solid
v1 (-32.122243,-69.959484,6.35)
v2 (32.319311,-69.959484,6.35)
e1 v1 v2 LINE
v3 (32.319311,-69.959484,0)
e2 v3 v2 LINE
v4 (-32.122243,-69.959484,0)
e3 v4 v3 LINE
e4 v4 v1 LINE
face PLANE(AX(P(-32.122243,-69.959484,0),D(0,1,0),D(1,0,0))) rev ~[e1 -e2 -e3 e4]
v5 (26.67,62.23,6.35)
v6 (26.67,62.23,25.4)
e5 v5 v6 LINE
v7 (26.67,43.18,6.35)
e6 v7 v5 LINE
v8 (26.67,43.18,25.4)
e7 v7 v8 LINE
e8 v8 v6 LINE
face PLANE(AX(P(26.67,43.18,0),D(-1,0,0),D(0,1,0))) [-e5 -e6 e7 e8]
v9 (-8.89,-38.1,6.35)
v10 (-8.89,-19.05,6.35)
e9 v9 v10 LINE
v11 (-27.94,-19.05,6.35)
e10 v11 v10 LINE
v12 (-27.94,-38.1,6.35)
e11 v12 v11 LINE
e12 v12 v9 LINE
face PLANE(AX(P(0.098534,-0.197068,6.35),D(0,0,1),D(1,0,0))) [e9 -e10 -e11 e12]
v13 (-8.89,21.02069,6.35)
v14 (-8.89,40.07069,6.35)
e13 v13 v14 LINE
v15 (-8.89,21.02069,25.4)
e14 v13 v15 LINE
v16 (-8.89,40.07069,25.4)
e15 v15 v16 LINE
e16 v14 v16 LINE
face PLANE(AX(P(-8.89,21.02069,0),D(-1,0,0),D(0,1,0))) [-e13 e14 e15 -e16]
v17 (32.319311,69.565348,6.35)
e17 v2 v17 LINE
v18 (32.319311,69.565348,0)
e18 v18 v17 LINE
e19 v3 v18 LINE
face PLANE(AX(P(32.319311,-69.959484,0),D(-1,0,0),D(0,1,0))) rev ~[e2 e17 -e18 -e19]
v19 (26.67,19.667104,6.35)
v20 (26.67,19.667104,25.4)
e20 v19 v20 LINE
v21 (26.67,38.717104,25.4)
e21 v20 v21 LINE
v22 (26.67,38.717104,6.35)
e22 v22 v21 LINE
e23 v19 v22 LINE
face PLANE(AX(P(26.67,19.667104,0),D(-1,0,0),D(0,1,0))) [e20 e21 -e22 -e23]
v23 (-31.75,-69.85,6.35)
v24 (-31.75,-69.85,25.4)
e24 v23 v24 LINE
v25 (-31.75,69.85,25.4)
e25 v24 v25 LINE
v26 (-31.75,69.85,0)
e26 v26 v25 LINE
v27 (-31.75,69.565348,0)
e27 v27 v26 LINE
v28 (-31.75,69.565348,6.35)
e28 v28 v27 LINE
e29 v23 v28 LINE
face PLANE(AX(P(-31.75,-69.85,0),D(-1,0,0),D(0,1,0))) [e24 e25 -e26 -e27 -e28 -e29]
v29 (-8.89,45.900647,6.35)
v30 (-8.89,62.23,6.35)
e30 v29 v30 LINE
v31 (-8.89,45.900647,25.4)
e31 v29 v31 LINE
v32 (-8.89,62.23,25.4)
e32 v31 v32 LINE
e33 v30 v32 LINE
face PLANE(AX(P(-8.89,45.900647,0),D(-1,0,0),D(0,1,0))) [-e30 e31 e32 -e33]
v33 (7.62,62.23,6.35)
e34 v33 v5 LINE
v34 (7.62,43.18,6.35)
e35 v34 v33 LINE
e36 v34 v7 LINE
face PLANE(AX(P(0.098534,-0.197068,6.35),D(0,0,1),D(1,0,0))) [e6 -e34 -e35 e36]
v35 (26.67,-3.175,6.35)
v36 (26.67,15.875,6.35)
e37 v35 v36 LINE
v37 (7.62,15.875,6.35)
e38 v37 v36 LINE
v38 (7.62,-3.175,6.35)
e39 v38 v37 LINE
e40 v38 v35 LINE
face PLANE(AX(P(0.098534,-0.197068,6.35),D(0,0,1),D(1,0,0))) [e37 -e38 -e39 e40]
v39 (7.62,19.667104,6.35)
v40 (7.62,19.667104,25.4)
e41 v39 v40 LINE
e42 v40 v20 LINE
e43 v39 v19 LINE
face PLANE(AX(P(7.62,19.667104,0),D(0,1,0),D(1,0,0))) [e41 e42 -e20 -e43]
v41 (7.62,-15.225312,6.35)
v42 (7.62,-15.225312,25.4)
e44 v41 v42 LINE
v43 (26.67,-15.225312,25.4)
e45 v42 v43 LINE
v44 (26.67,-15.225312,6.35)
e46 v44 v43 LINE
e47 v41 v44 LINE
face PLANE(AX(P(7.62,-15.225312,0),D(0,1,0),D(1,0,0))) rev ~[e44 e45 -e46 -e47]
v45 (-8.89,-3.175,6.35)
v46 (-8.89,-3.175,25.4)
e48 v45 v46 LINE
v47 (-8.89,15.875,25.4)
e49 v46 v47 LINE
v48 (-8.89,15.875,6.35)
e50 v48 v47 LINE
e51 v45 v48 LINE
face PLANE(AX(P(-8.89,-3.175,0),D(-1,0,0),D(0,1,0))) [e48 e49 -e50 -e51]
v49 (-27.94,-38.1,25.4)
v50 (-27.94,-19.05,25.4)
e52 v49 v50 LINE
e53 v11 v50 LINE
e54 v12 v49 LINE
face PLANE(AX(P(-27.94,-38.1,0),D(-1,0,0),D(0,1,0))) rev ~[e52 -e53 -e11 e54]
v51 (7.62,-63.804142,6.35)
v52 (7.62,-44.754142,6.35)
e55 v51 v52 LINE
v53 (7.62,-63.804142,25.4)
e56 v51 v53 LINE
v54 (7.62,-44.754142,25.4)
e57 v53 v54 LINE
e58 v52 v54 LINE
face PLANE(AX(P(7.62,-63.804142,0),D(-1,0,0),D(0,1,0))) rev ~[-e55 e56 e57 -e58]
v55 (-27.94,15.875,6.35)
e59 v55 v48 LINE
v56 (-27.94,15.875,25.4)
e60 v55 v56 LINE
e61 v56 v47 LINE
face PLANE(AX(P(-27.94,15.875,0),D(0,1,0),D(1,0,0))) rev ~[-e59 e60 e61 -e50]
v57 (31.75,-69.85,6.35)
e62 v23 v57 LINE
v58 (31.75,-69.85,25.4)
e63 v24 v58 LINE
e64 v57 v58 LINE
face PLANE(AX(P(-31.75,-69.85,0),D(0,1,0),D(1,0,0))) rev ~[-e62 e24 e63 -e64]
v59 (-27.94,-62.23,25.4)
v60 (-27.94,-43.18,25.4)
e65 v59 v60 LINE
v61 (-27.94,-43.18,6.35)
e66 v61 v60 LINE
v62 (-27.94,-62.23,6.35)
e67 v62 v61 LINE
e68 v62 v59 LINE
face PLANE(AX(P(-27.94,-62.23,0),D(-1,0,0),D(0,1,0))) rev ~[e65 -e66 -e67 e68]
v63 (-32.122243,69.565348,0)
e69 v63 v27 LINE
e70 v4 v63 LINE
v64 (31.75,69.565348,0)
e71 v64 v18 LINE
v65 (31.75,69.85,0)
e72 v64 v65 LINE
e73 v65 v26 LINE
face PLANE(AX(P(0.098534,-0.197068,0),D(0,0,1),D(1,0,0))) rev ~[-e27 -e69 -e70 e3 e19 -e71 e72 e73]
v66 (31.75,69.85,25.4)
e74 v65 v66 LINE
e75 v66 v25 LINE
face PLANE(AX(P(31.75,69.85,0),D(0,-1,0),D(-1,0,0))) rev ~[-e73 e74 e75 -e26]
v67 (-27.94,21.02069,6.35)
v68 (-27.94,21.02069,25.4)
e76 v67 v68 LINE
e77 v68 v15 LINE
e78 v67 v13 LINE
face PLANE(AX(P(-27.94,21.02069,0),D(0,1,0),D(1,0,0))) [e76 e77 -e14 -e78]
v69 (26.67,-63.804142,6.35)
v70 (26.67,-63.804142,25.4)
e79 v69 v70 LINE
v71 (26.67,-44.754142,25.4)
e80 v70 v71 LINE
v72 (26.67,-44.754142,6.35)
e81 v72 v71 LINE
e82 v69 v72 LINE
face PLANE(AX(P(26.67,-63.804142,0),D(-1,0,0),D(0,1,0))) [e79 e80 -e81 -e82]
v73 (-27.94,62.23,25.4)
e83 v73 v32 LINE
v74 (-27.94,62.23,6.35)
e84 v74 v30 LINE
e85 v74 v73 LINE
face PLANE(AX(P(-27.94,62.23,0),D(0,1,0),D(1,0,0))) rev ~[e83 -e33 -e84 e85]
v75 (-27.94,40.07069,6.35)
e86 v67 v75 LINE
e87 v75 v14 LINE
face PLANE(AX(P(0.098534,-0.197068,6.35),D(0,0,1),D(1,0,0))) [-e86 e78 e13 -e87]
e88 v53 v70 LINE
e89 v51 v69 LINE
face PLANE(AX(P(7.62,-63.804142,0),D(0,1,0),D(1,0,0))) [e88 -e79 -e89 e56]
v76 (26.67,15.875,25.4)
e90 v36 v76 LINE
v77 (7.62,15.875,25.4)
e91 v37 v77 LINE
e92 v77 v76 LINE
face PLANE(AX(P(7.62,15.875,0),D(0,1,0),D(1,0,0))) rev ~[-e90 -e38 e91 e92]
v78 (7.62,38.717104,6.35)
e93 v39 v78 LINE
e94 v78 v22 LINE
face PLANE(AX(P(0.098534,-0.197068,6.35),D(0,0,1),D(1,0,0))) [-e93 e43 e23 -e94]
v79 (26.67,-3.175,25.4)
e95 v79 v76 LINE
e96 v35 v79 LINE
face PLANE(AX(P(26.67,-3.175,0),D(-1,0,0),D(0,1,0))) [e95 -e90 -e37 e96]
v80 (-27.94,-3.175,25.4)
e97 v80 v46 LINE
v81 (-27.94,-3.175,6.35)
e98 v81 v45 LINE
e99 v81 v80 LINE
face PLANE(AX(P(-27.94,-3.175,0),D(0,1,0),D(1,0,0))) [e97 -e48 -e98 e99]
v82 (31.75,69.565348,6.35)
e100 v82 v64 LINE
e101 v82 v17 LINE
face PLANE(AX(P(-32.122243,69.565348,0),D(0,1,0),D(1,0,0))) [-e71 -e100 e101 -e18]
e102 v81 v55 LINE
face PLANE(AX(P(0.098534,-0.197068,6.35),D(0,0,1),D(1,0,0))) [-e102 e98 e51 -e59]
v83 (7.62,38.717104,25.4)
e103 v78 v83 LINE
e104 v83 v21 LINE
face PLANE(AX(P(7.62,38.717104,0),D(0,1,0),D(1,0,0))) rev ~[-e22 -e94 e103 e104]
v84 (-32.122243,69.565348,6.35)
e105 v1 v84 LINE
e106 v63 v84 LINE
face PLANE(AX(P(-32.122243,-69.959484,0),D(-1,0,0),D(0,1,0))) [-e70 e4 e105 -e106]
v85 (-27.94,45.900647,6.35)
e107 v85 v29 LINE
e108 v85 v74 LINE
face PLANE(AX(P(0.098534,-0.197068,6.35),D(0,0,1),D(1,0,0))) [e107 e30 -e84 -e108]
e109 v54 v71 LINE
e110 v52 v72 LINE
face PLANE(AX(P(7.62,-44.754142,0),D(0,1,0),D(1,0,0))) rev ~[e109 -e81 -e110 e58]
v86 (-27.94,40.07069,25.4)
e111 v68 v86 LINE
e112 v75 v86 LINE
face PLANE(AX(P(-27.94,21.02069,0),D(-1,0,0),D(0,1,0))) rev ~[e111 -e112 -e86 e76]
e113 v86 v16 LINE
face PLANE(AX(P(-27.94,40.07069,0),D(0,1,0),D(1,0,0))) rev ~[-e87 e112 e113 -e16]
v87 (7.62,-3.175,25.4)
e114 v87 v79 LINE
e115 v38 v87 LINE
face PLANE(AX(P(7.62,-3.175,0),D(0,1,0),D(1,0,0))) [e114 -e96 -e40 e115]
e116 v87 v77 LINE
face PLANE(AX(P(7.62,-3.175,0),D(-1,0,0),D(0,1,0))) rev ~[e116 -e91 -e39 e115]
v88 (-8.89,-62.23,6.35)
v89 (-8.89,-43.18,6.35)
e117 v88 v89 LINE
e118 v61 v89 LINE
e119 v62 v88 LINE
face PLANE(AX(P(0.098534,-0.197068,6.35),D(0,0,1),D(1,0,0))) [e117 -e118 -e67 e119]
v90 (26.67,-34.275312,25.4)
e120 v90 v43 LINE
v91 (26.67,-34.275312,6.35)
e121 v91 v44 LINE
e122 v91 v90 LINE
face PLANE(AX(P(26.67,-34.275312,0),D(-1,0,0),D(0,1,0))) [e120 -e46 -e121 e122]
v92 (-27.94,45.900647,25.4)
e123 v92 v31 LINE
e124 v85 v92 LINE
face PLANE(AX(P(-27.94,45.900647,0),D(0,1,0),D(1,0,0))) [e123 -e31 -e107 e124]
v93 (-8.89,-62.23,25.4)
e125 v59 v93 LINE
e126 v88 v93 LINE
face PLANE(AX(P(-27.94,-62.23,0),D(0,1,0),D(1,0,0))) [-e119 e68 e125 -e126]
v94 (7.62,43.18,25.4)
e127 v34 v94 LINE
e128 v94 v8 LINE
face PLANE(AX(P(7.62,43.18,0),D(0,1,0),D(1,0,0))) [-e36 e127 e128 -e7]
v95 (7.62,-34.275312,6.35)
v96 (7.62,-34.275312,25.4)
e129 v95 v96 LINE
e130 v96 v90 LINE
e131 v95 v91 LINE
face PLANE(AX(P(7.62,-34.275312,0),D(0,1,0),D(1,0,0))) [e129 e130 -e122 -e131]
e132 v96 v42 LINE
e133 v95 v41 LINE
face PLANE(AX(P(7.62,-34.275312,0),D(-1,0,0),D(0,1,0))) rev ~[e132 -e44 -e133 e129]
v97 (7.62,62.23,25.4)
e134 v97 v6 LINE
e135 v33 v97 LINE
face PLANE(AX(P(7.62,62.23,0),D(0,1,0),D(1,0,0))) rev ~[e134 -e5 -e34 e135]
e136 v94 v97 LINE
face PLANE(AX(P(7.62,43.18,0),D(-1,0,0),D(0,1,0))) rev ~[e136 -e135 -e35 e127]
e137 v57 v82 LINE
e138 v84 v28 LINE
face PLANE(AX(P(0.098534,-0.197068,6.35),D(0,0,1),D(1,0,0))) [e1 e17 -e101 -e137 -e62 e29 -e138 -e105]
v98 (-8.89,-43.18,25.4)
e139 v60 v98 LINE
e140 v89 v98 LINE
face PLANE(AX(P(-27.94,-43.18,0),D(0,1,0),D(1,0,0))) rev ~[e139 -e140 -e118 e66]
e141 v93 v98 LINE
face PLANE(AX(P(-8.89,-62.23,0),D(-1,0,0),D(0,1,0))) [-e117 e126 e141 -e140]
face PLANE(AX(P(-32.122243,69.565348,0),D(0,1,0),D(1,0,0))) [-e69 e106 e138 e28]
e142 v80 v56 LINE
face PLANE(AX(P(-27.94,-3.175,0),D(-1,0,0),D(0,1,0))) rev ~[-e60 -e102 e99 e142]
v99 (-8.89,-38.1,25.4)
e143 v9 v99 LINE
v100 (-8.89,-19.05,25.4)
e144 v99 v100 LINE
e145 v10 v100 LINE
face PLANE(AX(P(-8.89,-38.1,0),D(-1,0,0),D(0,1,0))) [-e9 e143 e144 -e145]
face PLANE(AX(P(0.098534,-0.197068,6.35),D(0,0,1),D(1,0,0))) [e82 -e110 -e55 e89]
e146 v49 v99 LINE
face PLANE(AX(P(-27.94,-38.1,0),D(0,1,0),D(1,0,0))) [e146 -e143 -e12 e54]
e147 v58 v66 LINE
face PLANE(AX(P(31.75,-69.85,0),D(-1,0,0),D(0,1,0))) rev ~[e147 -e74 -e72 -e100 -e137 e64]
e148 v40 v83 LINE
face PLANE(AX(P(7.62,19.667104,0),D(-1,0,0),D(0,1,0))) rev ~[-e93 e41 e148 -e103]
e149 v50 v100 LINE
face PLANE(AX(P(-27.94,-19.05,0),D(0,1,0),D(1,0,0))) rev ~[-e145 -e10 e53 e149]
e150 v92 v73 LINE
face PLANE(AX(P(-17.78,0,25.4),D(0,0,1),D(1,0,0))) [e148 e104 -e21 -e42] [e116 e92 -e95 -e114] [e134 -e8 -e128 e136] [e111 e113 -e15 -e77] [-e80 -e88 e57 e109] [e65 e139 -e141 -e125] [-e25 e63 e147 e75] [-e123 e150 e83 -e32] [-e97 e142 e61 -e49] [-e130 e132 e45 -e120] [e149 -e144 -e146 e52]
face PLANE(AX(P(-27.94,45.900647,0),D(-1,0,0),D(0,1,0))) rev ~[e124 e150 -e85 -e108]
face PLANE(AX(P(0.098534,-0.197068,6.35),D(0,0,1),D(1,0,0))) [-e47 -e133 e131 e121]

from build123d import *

# Parameters (mm, degrees)
F0_W     = 27.94
F0_H     = 139.7
F0_W_2   = 19.05
F0_H_2   = 19.05
F0_H_3   = 16.3293534029
F0_W_3   = 7.62
F1_DEPTH = 25.4
F2_W     = 64.4415542483
F2_H     = 139.5248323679
F3_DEPTH = 6.35


with BuildPart() as f1:
    # F0 (on Top) → F1 (new body)
    with BuildSketch(Plane.XY):
        with Locations((-17.78, 0)):
            Rectangle(F0_W, F0_H)
        with Locations((-18.415, -52.705)):
            Rectangle(F0_W_2, F0_H_2, mode=Mode.SUBTRACT)
        with Locations((-18.415, -28.575)):
            Rectangle(F0_W_2, F0_H_2, mode=Mode.SUBTRACT)
        with Locations((-18.415, 6.35)):
            Rectangle(F0_W_2, F0_H_2, mode=Mode.SUBTRACT)
        with Locations((-18.415, 30.5456899792)):
            Rectangle(F0_W_2, F0_H_2, mode=Mode.SUBTRACT)
        with Locations((-18.415, 54.0653232986)):
            Rectangle(F0_W_2, F0_H_3, mode=Mode.SUBTRACT)
        Rectangle(F0_W_3, F0_H)
        with Locations((17.78, 0)):
            Rectangle(F0_W, F0_H)
        with Locations((17.145, -54.2791421771)):
            Rectangle(F0_W_2, F0_H_2, mode=Mode.SUBTRACT)
        with Locations((17.145, -24.7503119767)):
            Rectangle(F0_W_2, F0_H_2, mode=Mode.SUBTRACT)
        with Locations((17.145, 6.35)):
            Rectangle(F0_W_2, F0_H_2, mode=Mode.SUBTRACT)
        with Locations((17.145, 29.1921038866)):
            Rectangle(F0_W_2, F0_H_2, mode=Mode.SUBTRACT)
        with Locations((17.145, 52.705)):
            Rectangle(F0_W_2, F0_H_2, mode=Mode.SUBTRACT)
    extrude(amount=F1_DEPTH)

    # F2 (on Top) → F3 (join)
    with BuildSketch(Plane.XY):
        with Locations((0.0985339284, -0.1970678568)):
            Rectangle(F2_W, F2_H)
    extrude(amount=F3_DEPTH)


solid = f1.part
